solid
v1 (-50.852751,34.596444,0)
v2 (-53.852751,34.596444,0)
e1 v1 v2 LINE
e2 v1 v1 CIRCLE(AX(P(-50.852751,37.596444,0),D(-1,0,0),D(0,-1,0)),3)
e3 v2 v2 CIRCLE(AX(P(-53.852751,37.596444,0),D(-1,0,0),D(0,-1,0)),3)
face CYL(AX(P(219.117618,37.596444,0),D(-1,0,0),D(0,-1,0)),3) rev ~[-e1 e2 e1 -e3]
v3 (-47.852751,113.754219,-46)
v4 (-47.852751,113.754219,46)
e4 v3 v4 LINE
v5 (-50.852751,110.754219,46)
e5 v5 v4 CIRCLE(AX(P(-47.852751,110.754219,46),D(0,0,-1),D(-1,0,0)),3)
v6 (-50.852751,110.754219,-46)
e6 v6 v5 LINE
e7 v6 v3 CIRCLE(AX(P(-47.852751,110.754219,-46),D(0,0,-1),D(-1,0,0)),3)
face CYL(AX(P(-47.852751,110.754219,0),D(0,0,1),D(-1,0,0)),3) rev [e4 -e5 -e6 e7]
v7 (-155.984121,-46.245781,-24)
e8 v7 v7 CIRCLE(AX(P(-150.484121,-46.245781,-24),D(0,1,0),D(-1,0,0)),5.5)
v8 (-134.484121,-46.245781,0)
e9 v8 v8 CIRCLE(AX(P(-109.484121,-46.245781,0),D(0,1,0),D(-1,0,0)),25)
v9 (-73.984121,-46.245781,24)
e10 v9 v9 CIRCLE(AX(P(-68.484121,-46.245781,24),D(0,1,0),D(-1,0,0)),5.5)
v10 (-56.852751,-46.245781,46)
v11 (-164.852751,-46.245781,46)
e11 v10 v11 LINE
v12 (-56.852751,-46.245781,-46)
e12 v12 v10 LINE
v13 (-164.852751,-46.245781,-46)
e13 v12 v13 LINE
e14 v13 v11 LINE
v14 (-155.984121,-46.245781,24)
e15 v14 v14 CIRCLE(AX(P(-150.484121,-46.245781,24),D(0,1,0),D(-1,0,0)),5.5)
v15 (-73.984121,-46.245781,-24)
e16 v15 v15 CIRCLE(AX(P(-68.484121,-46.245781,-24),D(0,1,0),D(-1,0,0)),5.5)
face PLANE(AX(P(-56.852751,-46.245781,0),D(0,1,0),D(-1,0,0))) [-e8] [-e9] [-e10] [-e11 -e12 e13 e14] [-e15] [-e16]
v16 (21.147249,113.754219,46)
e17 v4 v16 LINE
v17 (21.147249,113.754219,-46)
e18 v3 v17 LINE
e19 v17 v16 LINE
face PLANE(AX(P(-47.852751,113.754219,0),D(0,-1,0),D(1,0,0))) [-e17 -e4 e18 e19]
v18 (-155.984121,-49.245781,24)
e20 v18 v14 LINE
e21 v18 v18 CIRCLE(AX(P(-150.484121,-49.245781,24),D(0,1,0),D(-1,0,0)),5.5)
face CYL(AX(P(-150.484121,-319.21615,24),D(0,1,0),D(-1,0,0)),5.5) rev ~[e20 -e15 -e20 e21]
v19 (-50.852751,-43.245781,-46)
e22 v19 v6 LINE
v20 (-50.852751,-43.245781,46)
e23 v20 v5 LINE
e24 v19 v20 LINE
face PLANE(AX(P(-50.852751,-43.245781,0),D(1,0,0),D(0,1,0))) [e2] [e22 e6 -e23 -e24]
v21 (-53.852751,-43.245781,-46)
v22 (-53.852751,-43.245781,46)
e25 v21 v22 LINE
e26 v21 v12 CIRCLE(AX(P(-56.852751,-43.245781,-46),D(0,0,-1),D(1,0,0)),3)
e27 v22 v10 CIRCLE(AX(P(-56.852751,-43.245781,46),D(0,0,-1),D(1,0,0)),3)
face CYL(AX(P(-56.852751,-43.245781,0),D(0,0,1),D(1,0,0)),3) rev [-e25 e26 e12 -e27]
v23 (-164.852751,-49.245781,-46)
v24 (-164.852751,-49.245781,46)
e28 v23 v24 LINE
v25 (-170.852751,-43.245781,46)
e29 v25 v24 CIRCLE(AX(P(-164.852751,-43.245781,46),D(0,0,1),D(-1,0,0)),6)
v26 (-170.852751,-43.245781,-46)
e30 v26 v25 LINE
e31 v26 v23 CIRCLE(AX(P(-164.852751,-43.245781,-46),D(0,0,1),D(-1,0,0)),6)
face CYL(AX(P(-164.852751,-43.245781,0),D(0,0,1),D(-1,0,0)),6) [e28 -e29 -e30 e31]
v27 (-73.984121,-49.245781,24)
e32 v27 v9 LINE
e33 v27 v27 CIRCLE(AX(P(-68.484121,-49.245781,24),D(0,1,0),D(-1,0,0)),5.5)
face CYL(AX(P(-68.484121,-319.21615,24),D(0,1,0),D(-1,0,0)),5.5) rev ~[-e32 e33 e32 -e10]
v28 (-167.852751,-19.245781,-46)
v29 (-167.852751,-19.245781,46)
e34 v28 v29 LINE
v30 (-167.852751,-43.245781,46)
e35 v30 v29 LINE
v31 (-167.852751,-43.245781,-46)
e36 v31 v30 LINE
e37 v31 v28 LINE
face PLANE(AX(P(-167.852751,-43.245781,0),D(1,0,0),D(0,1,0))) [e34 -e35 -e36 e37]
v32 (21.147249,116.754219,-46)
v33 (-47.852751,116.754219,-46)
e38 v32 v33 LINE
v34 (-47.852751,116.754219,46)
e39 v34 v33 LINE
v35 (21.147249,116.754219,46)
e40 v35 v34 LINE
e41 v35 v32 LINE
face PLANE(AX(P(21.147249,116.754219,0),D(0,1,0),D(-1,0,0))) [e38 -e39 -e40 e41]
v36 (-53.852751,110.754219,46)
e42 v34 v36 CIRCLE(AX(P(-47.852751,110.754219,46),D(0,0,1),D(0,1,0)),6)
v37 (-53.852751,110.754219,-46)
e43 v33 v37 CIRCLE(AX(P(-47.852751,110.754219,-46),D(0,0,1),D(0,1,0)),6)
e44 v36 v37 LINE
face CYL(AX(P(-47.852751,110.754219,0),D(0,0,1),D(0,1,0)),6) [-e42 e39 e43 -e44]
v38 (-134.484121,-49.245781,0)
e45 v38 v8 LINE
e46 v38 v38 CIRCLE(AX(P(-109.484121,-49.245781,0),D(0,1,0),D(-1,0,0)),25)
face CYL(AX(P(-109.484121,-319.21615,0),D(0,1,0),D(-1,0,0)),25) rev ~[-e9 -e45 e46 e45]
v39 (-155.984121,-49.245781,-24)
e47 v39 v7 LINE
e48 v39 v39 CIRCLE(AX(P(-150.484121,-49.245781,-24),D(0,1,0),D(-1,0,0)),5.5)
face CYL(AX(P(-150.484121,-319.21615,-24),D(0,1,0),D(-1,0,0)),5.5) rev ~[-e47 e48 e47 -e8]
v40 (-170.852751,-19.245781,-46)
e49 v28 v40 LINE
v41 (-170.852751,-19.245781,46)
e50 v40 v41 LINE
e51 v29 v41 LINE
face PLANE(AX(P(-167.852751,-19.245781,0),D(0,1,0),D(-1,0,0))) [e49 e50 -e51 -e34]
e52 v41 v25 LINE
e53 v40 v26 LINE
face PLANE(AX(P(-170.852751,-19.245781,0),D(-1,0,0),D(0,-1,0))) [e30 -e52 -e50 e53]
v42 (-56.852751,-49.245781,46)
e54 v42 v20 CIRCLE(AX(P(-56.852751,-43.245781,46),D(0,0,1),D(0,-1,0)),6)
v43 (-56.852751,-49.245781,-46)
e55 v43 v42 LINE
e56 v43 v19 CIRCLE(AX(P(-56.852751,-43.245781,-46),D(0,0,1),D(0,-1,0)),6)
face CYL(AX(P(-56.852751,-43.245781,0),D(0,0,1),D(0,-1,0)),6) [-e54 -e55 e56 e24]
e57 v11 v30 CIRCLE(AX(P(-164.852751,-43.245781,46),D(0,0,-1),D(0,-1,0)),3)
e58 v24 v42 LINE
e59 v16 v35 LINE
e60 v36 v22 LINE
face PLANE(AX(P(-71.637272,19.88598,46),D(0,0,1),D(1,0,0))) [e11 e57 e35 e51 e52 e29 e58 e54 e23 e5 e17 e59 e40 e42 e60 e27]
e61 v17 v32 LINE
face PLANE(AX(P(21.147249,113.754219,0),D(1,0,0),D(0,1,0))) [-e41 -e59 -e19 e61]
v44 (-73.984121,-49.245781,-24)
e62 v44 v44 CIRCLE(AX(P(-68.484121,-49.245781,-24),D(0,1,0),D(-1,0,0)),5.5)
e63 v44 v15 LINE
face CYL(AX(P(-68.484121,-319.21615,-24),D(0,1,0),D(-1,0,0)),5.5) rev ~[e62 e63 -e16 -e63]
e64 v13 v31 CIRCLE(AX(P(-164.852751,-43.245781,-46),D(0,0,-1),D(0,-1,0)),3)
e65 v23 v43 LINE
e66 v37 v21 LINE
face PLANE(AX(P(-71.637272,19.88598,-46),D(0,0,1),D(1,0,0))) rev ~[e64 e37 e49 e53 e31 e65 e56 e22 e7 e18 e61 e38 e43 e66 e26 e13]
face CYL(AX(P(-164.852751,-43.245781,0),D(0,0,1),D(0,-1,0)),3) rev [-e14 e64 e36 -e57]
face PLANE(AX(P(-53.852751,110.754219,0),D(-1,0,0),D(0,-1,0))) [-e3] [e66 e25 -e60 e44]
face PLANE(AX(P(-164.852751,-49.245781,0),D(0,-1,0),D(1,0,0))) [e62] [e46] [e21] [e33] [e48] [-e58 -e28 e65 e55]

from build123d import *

# Parameters (mm, degrees)
F1_DEPTH = 46
F3_D     = 11
F4_D     = 50
F7_D     = 6


# Not quite as in the source:
# - the program builds the solid bodies; features that only make, move or delete a surface that nothing else refers to are left out


with BuildPart() as f1:
    # F0 (on Top) → F1 (new body, symmetric)
    with BuildSketch(Plane.XY):
        with BuildLine():
            Line((-53.8527505398, 110.754218787), (-53.8527505398, -43.245781213))
            ThreePointArc((-53.8527505398, -43.245781213), (-54.7314301962, -45.3671015566), (-56.8527505398, -46.245781213))
            Line((-56.8527505398, -46.245781213), (-164.8527505398, -46.245781213))
            ThreePointArc((-164.8527505398, -46.245781213), (-166.9740708833, -45.3671015566), (-167.8527505398, -43.245781213))
            Line((-167.8527505398, -43.245781213), (-167.8527505398, -19.245781213))
            Line((-167.8527505398, -19.245781213), (-170.8527505398, -19.245781213))
            Line((-170.8527505398, -19.245781213), (-170.8527505398, -43.245781213))
            ThreePointArc((-170.8527505398, -43.245781213), (-169.0953912269, -47.4884219002), (-164.8527505398, -49.245781213))
            Line((-164.8527505398, -49.245781213), (-56.8527505398, -49.245781213))
            ThreePointArc((-56.8527505398, -49.245781213), (-52.6101098527, -47.4884219002), (-50.8527505398, -43.245781213))
            Line((-50.8527505398, -43.245781213), (-50.8527505398, 110.754218787))
            ThreePointArc((-50.8527505398, 110.754218787), (-49.9740708833, 112.8755391305), (-47.8527505398, 113.754218787))
            Line((-47.8527505398, 113.754218787), (21.1472494602, 113.754218787))
            Line((21.1472494602, 113.754218787), (21.1472494602, 116.754218787))
            Line((21.1472494602, 116.754218787), (-47.8527505398, 116.754218787))
            ThreePointArc((-47.8527505398, 116.754218787), (-52.0953912269, 114.9968594741), (-53.8527505398, 110.754218787))
        make_face()
    extrude(amount=F1_DEPTH, both=True)

    # F3 (through all)
    with Locations(Plane.XZ.offset(49.245781213)):
        with Locations((-150.4841212034, 24), (-68.4841212034, 24), (-68.4841212034, -24), (-150.4841212034, -24)):
            Hole(F3_D / 2)

    # F4 (through all)
    with Locations(Plane.XZ.offset(49.245781213)):
        with Locations((-109.4841212034, 0)):
            Hole(F4_D / 2)

    # F7 (through all)
    with Locations(Plane.YZ.offset(-50.8527505398)):
        with Locations((37.5964443088, 0)):
            Hole(F7_D / 2)


solid = f1.part
